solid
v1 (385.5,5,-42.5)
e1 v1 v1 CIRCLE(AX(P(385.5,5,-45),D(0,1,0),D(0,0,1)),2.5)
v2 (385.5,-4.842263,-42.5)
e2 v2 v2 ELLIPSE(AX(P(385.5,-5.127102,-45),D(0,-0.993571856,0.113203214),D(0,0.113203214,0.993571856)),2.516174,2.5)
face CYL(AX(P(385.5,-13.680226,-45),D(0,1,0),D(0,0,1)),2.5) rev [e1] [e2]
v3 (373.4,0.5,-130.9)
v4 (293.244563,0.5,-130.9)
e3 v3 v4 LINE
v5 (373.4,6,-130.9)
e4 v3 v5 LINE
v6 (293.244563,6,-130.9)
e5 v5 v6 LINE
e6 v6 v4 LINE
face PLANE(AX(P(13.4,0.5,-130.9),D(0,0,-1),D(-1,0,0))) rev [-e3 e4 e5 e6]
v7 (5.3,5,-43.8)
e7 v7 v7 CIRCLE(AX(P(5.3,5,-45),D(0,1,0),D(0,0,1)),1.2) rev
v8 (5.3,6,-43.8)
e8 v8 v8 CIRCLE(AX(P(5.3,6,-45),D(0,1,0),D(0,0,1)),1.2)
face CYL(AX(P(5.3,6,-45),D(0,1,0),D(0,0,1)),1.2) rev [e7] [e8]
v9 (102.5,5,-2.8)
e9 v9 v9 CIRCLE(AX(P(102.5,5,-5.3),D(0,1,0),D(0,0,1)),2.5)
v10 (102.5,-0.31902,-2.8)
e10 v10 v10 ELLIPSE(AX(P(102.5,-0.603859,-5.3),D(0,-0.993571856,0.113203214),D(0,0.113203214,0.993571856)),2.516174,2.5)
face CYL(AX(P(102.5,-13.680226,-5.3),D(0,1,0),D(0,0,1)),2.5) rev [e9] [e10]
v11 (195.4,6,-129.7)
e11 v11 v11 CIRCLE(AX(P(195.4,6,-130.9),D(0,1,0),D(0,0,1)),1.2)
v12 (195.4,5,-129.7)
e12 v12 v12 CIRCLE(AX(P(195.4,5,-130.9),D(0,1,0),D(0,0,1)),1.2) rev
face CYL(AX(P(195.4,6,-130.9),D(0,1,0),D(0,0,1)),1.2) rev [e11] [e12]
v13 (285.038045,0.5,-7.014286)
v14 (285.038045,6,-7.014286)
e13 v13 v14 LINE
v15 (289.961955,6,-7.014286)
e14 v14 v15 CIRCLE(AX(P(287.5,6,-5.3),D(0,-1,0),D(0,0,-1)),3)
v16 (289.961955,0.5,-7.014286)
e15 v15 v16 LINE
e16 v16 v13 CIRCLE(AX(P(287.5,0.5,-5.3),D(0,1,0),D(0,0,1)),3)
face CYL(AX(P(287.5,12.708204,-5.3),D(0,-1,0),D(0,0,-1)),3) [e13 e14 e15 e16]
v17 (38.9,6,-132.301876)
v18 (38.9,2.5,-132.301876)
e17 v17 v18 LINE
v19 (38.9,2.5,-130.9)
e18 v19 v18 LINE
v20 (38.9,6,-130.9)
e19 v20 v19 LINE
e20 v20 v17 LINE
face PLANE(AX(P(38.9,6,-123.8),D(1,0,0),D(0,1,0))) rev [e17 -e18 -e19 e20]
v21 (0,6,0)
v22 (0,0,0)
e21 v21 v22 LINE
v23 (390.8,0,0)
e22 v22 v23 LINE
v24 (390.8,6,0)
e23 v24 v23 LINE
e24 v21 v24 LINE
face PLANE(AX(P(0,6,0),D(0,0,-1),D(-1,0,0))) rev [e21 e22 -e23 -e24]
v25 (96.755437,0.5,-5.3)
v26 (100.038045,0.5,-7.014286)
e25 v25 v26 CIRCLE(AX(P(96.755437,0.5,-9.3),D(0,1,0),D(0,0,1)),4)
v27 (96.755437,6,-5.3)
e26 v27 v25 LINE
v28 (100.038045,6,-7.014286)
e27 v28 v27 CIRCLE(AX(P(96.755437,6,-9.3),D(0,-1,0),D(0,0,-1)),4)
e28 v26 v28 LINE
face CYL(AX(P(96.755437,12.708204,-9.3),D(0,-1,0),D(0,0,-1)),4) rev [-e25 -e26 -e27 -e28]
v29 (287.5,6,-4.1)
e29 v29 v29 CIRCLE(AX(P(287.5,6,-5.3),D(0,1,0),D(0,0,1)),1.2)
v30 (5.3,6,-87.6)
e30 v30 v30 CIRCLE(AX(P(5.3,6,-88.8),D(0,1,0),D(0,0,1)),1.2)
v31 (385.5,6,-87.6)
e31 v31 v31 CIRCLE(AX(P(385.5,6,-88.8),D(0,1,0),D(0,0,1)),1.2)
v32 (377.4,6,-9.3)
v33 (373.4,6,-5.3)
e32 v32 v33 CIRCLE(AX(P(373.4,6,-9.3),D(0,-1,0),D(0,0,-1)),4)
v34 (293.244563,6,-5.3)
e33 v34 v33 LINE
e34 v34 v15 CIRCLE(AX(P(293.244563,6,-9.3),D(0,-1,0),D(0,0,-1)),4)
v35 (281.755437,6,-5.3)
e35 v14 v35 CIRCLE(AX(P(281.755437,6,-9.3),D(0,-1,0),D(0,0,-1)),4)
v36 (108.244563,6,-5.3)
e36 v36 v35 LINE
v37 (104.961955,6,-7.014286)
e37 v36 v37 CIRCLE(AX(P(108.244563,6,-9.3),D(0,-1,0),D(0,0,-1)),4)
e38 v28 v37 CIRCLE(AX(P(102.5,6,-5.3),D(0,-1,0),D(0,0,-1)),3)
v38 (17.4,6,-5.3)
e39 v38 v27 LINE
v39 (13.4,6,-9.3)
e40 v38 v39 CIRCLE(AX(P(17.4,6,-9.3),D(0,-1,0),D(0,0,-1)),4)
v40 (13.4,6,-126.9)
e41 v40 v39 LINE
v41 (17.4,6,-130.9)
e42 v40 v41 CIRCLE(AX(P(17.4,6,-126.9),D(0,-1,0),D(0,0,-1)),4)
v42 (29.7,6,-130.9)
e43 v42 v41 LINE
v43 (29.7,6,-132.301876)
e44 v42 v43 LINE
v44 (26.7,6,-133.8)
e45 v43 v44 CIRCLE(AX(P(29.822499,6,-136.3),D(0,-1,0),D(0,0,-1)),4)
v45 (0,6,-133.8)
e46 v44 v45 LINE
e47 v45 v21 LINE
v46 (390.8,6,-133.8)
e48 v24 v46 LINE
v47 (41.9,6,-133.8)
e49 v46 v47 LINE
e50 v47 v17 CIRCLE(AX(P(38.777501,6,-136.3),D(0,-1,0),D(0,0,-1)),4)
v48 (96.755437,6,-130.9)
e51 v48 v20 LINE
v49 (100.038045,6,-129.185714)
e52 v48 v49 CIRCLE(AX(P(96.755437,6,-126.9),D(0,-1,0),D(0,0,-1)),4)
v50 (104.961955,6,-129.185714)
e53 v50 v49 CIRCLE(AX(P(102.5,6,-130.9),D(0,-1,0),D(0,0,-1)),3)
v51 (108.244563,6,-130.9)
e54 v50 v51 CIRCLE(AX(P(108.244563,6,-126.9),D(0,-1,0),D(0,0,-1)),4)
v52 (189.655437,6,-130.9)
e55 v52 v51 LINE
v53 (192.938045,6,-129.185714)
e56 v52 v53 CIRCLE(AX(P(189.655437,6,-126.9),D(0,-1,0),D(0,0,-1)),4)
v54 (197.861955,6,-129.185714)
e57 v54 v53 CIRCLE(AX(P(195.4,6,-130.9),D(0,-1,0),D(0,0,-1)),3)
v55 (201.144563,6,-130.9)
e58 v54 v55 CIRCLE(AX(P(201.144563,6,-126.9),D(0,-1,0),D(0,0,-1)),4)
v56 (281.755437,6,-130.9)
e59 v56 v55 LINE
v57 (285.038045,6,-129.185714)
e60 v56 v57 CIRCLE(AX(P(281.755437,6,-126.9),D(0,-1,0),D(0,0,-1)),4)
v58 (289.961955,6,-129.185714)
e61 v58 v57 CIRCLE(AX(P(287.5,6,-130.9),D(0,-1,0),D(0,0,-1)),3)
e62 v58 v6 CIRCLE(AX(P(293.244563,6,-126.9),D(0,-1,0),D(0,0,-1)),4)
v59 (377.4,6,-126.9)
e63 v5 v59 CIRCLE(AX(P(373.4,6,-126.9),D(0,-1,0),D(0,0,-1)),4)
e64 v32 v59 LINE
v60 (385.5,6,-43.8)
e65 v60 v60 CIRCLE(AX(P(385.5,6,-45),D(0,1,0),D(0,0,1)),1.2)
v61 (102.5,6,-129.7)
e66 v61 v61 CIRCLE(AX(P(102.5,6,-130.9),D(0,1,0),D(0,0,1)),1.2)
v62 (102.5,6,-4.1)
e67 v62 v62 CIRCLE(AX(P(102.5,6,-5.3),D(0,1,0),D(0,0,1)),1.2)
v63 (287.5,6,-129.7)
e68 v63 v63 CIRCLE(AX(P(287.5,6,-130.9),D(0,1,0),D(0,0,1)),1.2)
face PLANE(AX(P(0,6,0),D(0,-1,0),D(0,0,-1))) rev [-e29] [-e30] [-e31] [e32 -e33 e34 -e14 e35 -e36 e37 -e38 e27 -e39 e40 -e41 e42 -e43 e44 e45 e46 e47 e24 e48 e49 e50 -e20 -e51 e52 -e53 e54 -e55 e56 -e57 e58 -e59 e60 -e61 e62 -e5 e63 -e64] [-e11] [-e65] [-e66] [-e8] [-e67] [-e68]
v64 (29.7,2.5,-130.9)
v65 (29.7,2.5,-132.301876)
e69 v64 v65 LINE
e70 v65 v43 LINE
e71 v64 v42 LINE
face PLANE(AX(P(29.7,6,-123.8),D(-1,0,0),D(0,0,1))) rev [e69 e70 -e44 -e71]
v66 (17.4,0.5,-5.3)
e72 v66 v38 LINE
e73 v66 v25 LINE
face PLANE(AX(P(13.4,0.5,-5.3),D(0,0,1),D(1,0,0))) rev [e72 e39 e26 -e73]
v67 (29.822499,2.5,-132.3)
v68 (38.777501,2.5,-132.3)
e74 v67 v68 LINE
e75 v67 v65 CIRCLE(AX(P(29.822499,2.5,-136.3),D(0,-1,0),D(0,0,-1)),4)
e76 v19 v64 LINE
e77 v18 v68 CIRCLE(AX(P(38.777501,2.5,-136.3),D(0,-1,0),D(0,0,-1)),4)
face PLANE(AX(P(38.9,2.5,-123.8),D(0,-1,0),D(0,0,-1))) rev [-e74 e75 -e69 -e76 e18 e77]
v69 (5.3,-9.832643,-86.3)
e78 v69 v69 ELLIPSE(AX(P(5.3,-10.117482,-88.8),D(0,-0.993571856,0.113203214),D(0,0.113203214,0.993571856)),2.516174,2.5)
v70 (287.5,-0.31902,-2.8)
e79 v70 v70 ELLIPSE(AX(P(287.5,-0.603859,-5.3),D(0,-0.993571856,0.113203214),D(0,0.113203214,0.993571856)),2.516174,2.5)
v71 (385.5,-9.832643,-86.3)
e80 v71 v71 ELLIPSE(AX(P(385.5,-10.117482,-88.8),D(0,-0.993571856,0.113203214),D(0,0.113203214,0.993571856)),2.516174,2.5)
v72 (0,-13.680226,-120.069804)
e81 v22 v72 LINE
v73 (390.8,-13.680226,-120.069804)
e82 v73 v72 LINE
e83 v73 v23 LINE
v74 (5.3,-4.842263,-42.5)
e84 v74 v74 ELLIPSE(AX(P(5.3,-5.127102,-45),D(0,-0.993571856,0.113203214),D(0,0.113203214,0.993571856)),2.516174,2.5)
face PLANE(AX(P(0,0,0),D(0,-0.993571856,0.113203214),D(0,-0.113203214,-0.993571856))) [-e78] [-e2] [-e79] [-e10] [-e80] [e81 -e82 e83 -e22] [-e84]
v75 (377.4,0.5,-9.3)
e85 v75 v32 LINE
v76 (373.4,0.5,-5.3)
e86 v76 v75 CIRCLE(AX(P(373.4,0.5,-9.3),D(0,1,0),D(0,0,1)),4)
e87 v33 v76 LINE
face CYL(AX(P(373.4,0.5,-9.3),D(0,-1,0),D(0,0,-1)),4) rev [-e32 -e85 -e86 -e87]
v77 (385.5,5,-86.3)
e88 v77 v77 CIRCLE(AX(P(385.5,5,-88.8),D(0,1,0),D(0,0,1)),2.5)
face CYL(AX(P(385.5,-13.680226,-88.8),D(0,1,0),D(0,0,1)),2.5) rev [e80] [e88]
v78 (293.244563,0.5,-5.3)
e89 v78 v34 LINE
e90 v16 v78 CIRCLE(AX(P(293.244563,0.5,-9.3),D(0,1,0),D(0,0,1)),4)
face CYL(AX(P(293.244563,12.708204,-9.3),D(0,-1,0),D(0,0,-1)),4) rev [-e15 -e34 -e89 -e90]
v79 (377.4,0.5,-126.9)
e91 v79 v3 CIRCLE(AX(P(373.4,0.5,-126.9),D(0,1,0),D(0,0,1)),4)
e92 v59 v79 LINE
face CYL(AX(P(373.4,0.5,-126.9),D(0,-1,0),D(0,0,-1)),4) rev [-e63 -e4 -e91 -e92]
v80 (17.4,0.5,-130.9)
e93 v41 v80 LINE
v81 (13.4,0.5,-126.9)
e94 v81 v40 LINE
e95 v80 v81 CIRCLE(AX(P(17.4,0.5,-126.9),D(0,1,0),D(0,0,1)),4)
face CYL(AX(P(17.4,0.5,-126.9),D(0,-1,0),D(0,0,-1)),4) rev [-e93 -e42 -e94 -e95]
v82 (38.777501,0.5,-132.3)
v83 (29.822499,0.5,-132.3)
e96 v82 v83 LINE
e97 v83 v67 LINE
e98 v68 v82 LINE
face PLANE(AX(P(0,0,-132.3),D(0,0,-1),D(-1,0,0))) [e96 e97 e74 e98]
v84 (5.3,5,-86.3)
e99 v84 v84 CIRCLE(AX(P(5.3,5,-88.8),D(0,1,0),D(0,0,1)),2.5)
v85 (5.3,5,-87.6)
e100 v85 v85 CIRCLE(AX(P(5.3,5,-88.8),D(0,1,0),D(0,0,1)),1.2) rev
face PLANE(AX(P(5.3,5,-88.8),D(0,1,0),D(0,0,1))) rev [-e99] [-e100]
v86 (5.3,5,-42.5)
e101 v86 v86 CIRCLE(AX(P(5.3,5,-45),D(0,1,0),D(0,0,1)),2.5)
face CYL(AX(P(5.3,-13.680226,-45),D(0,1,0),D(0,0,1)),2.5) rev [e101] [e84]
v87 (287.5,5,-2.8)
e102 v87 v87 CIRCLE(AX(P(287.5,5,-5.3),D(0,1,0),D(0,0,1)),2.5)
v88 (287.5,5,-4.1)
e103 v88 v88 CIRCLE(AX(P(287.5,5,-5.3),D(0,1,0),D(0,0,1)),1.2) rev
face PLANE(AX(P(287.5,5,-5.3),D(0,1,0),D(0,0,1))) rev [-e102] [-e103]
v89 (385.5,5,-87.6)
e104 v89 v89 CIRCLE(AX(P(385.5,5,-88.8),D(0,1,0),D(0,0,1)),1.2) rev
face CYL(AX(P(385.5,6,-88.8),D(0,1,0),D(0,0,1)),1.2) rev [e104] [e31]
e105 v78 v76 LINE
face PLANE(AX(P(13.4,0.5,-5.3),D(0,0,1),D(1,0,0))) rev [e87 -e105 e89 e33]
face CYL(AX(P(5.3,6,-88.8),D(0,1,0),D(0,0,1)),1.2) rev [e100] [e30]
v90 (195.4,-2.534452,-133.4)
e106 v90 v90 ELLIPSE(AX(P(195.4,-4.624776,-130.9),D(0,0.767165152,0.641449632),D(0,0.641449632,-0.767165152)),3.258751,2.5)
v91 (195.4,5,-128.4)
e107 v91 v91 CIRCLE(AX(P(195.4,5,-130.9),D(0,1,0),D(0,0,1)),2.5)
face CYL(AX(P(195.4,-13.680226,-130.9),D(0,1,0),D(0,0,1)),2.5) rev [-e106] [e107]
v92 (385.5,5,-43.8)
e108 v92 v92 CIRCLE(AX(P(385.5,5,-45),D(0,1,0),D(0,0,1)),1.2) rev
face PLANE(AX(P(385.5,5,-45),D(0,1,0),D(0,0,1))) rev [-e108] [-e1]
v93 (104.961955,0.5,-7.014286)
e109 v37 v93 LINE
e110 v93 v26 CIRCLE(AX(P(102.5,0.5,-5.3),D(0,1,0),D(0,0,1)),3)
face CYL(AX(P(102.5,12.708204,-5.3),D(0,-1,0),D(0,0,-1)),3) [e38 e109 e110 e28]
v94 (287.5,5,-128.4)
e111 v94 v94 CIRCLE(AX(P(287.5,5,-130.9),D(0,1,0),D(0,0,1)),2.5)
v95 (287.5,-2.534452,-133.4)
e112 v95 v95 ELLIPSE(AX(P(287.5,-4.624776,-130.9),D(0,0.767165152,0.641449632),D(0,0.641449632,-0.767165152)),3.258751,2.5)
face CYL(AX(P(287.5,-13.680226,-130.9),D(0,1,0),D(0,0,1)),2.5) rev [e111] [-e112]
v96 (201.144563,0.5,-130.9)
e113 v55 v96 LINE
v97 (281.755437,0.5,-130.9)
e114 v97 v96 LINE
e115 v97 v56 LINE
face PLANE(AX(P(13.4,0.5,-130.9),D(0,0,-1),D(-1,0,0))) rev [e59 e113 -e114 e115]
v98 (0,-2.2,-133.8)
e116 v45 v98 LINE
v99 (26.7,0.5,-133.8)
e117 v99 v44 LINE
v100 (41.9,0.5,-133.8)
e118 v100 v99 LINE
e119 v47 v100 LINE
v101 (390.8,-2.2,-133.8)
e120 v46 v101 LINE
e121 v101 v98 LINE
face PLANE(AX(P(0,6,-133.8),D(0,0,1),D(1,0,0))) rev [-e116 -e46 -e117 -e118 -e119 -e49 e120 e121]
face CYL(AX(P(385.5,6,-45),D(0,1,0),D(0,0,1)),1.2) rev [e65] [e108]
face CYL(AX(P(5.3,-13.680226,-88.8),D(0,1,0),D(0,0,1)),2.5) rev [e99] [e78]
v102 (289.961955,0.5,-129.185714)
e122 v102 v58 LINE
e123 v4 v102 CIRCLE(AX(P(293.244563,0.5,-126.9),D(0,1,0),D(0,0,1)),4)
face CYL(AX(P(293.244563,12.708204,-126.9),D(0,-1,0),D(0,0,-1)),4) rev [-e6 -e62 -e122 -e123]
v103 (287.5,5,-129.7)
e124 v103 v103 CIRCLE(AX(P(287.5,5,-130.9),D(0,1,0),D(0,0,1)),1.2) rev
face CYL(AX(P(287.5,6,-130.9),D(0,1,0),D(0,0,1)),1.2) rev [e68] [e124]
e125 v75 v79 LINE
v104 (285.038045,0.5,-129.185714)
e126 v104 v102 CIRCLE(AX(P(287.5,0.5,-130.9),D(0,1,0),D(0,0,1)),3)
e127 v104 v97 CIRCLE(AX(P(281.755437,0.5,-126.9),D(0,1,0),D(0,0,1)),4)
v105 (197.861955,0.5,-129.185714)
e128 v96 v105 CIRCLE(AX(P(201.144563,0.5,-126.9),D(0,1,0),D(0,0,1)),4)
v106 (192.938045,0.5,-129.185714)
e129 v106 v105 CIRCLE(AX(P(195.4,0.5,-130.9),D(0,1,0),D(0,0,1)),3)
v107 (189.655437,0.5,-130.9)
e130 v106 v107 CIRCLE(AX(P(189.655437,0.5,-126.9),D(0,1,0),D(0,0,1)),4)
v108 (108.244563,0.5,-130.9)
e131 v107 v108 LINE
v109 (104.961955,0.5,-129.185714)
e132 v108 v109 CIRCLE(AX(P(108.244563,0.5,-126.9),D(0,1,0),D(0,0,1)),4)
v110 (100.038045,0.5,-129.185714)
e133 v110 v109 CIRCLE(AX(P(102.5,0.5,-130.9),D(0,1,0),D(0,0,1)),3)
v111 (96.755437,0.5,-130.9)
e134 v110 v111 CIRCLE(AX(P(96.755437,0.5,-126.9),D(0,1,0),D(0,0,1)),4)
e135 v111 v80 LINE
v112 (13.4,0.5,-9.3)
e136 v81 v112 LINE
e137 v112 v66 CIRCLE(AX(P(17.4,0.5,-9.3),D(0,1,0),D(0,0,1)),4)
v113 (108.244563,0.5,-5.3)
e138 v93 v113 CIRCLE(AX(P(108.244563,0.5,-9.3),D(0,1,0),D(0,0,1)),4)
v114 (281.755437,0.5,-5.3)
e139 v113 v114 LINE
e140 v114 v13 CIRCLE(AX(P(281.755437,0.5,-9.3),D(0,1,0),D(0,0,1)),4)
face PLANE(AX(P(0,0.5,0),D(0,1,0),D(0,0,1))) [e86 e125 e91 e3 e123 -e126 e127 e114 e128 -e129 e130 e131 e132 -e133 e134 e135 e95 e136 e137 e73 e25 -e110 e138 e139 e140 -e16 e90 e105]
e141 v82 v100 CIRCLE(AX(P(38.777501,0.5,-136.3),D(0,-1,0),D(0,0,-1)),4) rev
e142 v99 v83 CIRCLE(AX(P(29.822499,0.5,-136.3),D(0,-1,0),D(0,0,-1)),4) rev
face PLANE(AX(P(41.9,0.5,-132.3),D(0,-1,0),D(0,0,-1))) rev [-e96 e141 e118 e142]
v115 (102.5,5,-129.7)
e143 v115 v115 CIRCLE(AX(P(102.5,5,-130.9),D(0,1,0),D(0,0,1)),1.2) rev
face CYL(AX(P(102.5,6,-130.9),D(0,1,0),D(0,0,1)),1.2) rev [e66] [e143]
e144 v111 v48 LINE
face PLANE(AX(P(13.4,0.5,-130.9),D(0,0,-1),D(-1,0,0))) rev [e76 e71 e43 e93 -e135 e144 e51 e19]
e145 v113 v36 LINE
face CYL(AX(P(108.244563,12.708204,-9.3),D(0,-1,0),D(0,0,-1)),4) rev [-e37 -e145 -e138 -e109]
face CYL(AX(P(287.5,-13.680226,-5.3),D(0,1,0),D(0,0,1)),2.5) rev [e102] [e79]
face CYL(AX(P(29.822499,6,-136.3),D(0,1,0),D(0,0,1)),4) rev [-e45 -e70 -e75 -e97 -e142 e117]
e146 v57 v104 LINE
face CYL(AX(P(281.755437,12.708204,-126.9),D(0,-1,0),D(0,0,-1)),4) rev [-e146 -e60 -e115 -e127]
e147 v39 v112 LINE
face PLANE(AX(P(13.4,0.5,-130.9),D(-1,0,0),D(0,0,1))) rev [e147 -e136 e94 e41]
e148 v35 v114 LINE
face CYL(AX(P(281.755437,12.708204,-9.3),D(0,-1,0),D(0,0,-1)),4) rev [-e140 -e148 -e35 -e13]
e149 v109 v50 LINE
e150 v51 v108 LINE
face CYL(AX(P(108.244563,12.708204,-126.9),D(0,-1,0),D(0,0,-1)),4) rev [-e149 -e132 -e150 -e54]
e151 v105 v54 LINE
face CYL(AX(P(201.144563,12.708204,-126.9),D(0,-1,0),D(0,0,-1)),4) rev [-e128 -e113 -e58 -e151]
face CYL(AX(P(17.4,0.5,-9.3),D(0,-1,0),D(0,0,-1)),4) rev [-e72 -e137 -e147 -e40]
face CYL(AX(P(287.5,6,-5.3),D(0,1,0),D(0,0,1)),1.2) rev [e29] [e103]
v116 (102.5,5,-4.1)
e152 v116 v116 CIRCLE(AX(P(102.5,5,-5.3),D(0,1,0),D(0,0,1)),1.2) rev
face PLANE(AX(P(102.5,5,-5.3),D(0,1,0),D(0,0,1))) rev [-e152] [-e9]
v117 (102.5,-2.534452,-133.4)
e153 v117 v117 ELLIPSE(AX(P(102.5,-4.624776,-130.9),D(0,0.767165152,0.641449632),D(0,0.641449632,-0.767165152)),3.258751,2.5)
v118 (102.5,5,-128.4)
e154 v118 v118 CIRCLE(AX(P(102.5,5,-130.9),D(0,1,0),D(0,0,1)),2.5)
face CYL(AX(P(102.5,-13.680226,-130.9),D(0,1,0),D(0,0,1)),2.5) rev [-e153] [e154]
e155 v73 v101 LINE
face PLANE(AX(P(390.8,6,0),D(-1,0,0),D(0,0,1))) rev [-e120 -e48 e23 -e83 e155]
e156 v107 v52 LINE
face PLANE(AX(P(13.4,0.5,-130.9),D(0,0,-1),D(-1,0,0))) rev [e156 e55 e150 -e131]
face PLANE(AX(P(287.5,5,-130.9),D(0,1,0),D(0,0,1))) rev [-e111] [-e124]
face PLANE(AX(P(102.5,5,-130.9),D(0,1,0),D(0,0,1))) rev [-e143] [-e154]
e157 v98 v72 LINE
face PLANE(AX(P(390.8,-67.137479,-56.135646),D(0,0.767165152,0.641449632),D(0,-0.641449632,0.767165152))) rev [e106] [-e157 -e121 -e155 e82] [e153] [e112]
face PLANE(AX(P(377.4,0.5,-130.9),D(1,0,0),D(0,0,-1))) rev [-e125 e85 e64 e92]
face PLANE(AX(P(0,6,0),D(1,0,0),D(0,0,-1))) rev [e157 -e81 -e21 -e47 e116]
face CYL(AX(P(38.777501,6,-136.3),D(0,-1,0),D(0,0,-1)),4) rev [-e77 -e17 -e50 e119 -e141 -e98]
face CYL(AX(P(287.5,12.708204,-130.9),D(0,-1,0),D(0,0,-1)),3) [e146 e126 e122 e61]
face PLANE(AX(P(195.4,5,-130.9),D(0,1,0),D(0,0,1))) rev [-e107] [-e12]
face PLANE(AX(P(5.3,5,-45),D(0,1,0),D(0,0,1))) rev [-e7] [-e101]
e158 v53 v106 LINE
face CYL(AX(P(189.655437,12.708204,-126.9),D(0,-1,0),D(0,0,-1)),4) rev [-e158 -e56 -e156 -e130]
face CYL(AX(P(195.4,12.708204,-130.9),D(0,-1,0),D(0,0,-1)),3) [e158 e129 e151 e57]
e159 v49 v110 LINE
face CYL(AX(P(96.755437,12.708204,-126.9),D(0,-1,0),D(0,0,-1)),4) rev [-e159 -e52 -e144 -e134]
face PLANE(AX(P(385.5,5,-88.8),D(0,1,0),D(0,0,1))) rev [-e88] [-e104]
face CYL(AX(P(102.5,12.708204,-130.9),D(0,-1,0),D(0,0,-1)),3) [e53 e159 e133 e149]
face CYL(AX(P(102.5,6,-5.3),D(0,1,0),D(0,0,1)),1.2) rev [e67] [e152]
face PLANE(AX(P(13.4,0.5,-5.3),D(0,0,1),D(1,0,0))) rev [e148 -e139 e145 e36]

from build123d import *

# Parameters (mm, degrees)
SKETCH1_W               = 390.8
SKETCH1_H               = 133.8
BOSS_EXTRUDE1_DEPTH     = 6
SKETCH2_W               = 364
SKETCH2_H               = 125.6
CUT_EXTRUDE1_DEPTH      = 5.5
BOSS_EXTRUDE3_DEPTH     = 390.8
SKETCH8_W               = 9.2
SKETCH8_H               = 3.5
CUT_EXTRUDE2_DEPTH      = 10
BOSS_EXTRUDE4_DEPTH     = 5.5
SKETCH11_W              = 15.2
SKETCH11_H              = 5.5
CUT_EXTRUDE3_DEPTH      = 1.5
CUT_EXTRUDE6_DEPTH      = 414.351517904
CUT_EXTRUDE6_DEPTH_BACK = 414.351517904
FILLET1_R               = 4
M2_CLEARANCE_HOLE1_D    = 2.4
CUT_EXTRUDE7_START      = -1
SKETCH13_R              = 2.5
CUT_EXTRUDE7_DEPTH      = 413.538863107
FILLET2_R               = 4


with BuildPart() as part:
    # Sketch1 → Boss-Extrude1 (new body)
    with BuildSketch(Plane(origin=(0, 0, 0), x_dir=(1, 0, 0), z_dir=(0, 1, 0))):
        with Locations((195.4, 66.9)):
            Rectangle(SKETCH1_W, SKETCH1_H)
    extrude(amount=BOSS_EXTRUDE1_DEPTH)

    # Sketch2 → Cut-Extrude1 (cut)
    with BuildSketch(Plane(origin=(0, 6, 0), x_dir=(1, 0, 0), z_dir=(0, 1, 0))):
        with Locations((195.4, 68.1)):
            Rectangle(SKETCH2_W, SKETCH2_H)
    extrude(amount=-CUT_EXTRUDE1_DEPTH, mode=Mode.SUBTRACT)

    # Boss-Extrude3: read off the stored shape, not the designer's step
    # Boss-Extrude3 outline → Boss-Extrude3 (add)
    with BuildSketch(Plane.YZ):
        Polygon((-15.244584391, -133.8), (0, -133.8), (0, 0), align=None)
    extrude(amount=BOSS_EXTRUDE3_DEPTH)

    # Sketch8 → Cut-Extrude2 (cut)
    with BuildSketch(Plane(origin=(0, 0, -133.8), x_dir=(-1, 0, 0), z_dir=(0, 0, -1))):
        with Locations((-34.3, 4.25)):
            Rectangle(SKETCH8_W, SKETCH8_H)
    extrude(amount=-CUT_EXTRUDE2_DEPTH, mode=Mode.SUBTRACT)

    # Sketch10 → Boss-Extrude4 (add)
    with BuildSketch(Plane(origin=(0, 0.5, 0), x_dir=(1, 0, 0), z_dir=(0, 1, 0))):
        with BuildLine():
            Line((99.5, 5.3), (105.5, 5.3))
            ThreePointArc((105.5, 5.3), (102.5, 8.3), (99.5, 5.3))
        make_face()
        with BuildLine():
            ThreePointArc((290.5, 5.3), (287.5, 8.3), (284.5, 5.3))
            Line((284.5, 5.3), (290.5, 5.3))
        make_face()
        with BuildLine():
            Line((105.5, 130.9), (99.5, 130.9))
            ThreePointArc((99.5, 130.9), (102.5, 127.9), (105.5, 130.9))
        make_face()
        with BuildLine():
            ThreePointArc((284.5, 130.9), (287.5, 127.9), (290.5, 130.9))
            Line((290.5, 130.9), (284.5, 130.9))
        make_face()
        with BuildLine():
            Line((198.4, 130.9), (192.4, 130.9))
            ThreePointArc((192.4, 130.9), (195.4, 127.9), (198.4, 130.9))
        make_face()
    extrude(amount=BOSS_EXTRUDE4_DEPTH)

    # Sketch11 → Cut-Extrude3 (cut)
    with BuildSketch(Plane(origin=(0, 0, -133.8), x_dir=(-1, 0, 0), z_dir=(0, 0, -1))):
        with Locations((-34.3, 3.25)):
            Rectangle(SKETCH11_W, SKETCH11_H)
    extrude(amount=-CUT_EXTRUDE3_DEPTH, mode=Mode.SUBTRACT)

    # Sketch12 → Cut-Extrude6 (cut, two sides: drawn at the far end of the back side and taken through both)
    with BuildSketch(Plane.ZY.offset(-CUT_EXTRUDE6_DEPTH_BACK)):
        Polygon((-133.8, -15.244584391), (-120.069803619, -13.680226114), (-133.8, -2.2), align=None)
    extrude(amount=CUT_EXTRUDE6_DEPTH + CUT_EXTRUDE6_DEPTH_BACK, mode=Mode.SUBTRACT)

    # Fillet1
    fillet1_edges = [part.edges().sort_by_distance(p)[0] for p in [
        (13.4, 3.25, -5.3),
        (13.4, 3.25, -130.9),
        (377.4, 3.25, -130.9),
        (377.4, 3.25, -5.3),
        (99.5, 3.25, -130.9),
        (105.5, 3.25, -130.9),
        (192.4, 3.25, -130.9),
        (198.4, 3.25, -130.9),
        (284.5, 3.25, -130.9),
        (290.5, 3.25, -130.9),
        (290.5, 3.25, -5.3),
        (284.5, 3.25, -5.3),
        (105.5, 3.25, -5.3),
        (99.5, 3.25, -5.3),
    ]]
    fillet(fillet1_edges, radius=FILLET1_R)

    # M2 Clearance Hole1 (through all)
    with Locations(Plane(origin=(102.5, 6, -5.3), x_dir=(0, 0, 1), z_dir=(0, 1, 0))):
        with Locations((0, 0), (-39.7, -97.2), (-83.5, -97.2), (-125.6, 0), (-125.6, 92.9), (-125.6, 185), (-83.5, 283), (-39.7, 283), (0, 185)):
            Hole(M2_CLEARANCE_HOLE1_D / 2)

    # Sketch13 → Cut-Extrude7 (cut, through all)
    with BuildSketch(Plane(origin=(0, 6, 0), x_dir=(1, 0, 0), z_dir=(0, 1, 0)).offset(CUT_EXTRUDE7_START)):
        with Locations(Location((5.3, 45, 0), (0, 0, 270))):
            Circle(SKETCH13_R)
        with Locations(Location((5.3, 88.8, 0), (0, 0, 270))):
            Circle(SKETCH13_R)
        with Locations(Location((102.5, 5.3, 0), (0, 0, 270))):
            Circle(SKETCH13_R)
        with Locations(Location((287.5, 5.3, 0), (0, 0, 270))):
            Circle(SKETCH13_R)
        with Locations(Location((385.5, 45, 0), (0, 0, 270))):
            Circle(SKETCH13_R)
        with Locations(Location((385.5, 88.8, 0), (0, 0, 270))):
            Circle(SKETCH13_R)
        with Locations(Location((287.5, 130.9, 0), (0, 0, 270))):
            Circle(SKETCH13_R)
        with Locations(Location((195.4, 130.9, 0), (0, 0, 270))):
            Circle(SKETCH13_R)
        with Locations(Location((102.5, 130.9, 0), (0, 0, 270))):
            Circle(SKETCH13_R)
    extrude(amount=-CUT_EXTRUDE7_DEPTH, mode=Mode.SUBTRACT)

    # Fillet2
    # the kernel refuses this fillet: 4 mm, written as the material it adds along each edge
    with BuildSketch(Plane(origin=(41.9, -7.306247498, -132.3), x_dir=(-1, 0, 0), z_dir=(0, 1, 0))) as fillet2_piece_1_section:
        with BuildLine():
            CenterArc((3.122498999, -4), FILLET2_R, 90, 51.317812547)
            Line((0, -1.5), (0, 0))
            Line((0, 0), (3.122498999, 0))
        make_face()
    fillet2_piece_1 = extrude(amount=21.112494996, mode=Mode.PRIVATE)
    fillet2_piece_1 = split(fillet2_piece_1, bisect_by=Plane(origin=(41.9, 2.5, -132.3), z_dir=(0, -1, 0)), keep=Keep.TOP, mode=Mode.PRIVATE)
    fillet2_piece_1 = split(fillet2_piece_1, bisect_by=Plane(origin=(41.9, -5.039151199, -130.404413264), z_dir=(0, 0.7671651518152931, 0.6414496315691656)), keep=Keep.TOP, mode=Mode.PRIVATE)
    add(fillet2_piece_1)
    with BuildSketch(Plane(origin=(41.9, -7.306247498, -132.3), x_dir=(-1, 0, 0), z_dir=(0, 1, 0))) as fillet2_piece_2_section:
        with BuildLine():
            CenterArc((3.122498999, -4), FILLET2_R, 90, 51.317812547)
            Line((0, -1.5), (0, 0))
            Line((0, 0), (3.122498999, 0))
        make_face()
    fillet2_piece_2 = extrude(amount=13.306247498, mode=Mode.PRIVATE)
    fillet2_piece_2 = split(fillet2_piece_2, bisect_by=Plane(origin=(38.9, -7.306247498, -132.3), z_dir=(1, 0, 0)), keep=Keep.TOP, mode=Mode.PRIVATE)
    fillet2_piece_2 = split(fillet2_piece_2, bisect_by=Plane(origin=(41.9, -5.039151199, -130.404413264), z_dir=(0, 0.7671651518152931, 0.6414496315691656)), keep=Keep.TOP, mode=Mode.PRIVATE)
    add(fillet2_piece_2)
    with BuildSketch(Plane(origin=(26.7, 6, -132.3), x_dir=(1, 0, 0), z_dir=(0, -1, 0))) as fillet2_piece_3_section:
        with BuildLine():
            CenterArc((3.122498999, -4), FILLET2_R, 90, 51.317812547)
            Line((0, -1.5), (0, 0))
            Line((0, 0), (3.122498999, 0))
        make_face()
    fillet2_piece_3 = extrude(amount=13.306247498, mode=Mode.PRIVATE)
    fillet2_piece_3 = split(fillet2_piece_3, bisect_by=Plane(origin=(29.7, 6, -132.3), z_dir=(-1, 0, 0)), keep=Keep.TOP, mode=Mode.PRIVATE)
    fillet2_piece_3 = split(fillet2_piece_3, bisect_by=Plane(origin=(26.7, 0.435805859, -136.952388437), z_dir=(0, 0.7671651518152931, 0.6414496315691656)), keep=Keep.TOP, mode=Mode.PRIVATE)
    add(fillet2_piece_3)
    with BuildSketch(Plane(origin=(26.7, 13.806247498, -132.3), x_dir=(1, 0, 0), z_dir=(0, -1, 0))) as fillet2_piece_4_section:
        with BuildLine():
            CenterArc((3.122498999, -4), FILLET2_R, 90, 51.317812547)
            Line((0, -1.5), (0, 0))
            Line((0, 0), (3.122498999, 0))
        make_face()
    fillet2_piece_4 = extrude(amount=21.112494996, mode=Mode.PRIVATE)
    fillet2_piece_4 = split(fillet2_piece_4, bisect_by=Plane(origin=(26.7, 2.5, -132.3), z_dir=(0, -1, 0)), keep=Keep.TOP, mode=Mode.PRIVATE)
    fillet2_piece_4 = split(fillet2_piece_4, bisect_by=Plane(origin=(26.7, 3.647745952, -140.793825689), z_dir=(0, 0.7671651518152931, 0.6414496315691656)), keep=Keep.TOP, mode=Mode.PRIVATE)
    add(fillet2_piece_4)


solid = part.part
